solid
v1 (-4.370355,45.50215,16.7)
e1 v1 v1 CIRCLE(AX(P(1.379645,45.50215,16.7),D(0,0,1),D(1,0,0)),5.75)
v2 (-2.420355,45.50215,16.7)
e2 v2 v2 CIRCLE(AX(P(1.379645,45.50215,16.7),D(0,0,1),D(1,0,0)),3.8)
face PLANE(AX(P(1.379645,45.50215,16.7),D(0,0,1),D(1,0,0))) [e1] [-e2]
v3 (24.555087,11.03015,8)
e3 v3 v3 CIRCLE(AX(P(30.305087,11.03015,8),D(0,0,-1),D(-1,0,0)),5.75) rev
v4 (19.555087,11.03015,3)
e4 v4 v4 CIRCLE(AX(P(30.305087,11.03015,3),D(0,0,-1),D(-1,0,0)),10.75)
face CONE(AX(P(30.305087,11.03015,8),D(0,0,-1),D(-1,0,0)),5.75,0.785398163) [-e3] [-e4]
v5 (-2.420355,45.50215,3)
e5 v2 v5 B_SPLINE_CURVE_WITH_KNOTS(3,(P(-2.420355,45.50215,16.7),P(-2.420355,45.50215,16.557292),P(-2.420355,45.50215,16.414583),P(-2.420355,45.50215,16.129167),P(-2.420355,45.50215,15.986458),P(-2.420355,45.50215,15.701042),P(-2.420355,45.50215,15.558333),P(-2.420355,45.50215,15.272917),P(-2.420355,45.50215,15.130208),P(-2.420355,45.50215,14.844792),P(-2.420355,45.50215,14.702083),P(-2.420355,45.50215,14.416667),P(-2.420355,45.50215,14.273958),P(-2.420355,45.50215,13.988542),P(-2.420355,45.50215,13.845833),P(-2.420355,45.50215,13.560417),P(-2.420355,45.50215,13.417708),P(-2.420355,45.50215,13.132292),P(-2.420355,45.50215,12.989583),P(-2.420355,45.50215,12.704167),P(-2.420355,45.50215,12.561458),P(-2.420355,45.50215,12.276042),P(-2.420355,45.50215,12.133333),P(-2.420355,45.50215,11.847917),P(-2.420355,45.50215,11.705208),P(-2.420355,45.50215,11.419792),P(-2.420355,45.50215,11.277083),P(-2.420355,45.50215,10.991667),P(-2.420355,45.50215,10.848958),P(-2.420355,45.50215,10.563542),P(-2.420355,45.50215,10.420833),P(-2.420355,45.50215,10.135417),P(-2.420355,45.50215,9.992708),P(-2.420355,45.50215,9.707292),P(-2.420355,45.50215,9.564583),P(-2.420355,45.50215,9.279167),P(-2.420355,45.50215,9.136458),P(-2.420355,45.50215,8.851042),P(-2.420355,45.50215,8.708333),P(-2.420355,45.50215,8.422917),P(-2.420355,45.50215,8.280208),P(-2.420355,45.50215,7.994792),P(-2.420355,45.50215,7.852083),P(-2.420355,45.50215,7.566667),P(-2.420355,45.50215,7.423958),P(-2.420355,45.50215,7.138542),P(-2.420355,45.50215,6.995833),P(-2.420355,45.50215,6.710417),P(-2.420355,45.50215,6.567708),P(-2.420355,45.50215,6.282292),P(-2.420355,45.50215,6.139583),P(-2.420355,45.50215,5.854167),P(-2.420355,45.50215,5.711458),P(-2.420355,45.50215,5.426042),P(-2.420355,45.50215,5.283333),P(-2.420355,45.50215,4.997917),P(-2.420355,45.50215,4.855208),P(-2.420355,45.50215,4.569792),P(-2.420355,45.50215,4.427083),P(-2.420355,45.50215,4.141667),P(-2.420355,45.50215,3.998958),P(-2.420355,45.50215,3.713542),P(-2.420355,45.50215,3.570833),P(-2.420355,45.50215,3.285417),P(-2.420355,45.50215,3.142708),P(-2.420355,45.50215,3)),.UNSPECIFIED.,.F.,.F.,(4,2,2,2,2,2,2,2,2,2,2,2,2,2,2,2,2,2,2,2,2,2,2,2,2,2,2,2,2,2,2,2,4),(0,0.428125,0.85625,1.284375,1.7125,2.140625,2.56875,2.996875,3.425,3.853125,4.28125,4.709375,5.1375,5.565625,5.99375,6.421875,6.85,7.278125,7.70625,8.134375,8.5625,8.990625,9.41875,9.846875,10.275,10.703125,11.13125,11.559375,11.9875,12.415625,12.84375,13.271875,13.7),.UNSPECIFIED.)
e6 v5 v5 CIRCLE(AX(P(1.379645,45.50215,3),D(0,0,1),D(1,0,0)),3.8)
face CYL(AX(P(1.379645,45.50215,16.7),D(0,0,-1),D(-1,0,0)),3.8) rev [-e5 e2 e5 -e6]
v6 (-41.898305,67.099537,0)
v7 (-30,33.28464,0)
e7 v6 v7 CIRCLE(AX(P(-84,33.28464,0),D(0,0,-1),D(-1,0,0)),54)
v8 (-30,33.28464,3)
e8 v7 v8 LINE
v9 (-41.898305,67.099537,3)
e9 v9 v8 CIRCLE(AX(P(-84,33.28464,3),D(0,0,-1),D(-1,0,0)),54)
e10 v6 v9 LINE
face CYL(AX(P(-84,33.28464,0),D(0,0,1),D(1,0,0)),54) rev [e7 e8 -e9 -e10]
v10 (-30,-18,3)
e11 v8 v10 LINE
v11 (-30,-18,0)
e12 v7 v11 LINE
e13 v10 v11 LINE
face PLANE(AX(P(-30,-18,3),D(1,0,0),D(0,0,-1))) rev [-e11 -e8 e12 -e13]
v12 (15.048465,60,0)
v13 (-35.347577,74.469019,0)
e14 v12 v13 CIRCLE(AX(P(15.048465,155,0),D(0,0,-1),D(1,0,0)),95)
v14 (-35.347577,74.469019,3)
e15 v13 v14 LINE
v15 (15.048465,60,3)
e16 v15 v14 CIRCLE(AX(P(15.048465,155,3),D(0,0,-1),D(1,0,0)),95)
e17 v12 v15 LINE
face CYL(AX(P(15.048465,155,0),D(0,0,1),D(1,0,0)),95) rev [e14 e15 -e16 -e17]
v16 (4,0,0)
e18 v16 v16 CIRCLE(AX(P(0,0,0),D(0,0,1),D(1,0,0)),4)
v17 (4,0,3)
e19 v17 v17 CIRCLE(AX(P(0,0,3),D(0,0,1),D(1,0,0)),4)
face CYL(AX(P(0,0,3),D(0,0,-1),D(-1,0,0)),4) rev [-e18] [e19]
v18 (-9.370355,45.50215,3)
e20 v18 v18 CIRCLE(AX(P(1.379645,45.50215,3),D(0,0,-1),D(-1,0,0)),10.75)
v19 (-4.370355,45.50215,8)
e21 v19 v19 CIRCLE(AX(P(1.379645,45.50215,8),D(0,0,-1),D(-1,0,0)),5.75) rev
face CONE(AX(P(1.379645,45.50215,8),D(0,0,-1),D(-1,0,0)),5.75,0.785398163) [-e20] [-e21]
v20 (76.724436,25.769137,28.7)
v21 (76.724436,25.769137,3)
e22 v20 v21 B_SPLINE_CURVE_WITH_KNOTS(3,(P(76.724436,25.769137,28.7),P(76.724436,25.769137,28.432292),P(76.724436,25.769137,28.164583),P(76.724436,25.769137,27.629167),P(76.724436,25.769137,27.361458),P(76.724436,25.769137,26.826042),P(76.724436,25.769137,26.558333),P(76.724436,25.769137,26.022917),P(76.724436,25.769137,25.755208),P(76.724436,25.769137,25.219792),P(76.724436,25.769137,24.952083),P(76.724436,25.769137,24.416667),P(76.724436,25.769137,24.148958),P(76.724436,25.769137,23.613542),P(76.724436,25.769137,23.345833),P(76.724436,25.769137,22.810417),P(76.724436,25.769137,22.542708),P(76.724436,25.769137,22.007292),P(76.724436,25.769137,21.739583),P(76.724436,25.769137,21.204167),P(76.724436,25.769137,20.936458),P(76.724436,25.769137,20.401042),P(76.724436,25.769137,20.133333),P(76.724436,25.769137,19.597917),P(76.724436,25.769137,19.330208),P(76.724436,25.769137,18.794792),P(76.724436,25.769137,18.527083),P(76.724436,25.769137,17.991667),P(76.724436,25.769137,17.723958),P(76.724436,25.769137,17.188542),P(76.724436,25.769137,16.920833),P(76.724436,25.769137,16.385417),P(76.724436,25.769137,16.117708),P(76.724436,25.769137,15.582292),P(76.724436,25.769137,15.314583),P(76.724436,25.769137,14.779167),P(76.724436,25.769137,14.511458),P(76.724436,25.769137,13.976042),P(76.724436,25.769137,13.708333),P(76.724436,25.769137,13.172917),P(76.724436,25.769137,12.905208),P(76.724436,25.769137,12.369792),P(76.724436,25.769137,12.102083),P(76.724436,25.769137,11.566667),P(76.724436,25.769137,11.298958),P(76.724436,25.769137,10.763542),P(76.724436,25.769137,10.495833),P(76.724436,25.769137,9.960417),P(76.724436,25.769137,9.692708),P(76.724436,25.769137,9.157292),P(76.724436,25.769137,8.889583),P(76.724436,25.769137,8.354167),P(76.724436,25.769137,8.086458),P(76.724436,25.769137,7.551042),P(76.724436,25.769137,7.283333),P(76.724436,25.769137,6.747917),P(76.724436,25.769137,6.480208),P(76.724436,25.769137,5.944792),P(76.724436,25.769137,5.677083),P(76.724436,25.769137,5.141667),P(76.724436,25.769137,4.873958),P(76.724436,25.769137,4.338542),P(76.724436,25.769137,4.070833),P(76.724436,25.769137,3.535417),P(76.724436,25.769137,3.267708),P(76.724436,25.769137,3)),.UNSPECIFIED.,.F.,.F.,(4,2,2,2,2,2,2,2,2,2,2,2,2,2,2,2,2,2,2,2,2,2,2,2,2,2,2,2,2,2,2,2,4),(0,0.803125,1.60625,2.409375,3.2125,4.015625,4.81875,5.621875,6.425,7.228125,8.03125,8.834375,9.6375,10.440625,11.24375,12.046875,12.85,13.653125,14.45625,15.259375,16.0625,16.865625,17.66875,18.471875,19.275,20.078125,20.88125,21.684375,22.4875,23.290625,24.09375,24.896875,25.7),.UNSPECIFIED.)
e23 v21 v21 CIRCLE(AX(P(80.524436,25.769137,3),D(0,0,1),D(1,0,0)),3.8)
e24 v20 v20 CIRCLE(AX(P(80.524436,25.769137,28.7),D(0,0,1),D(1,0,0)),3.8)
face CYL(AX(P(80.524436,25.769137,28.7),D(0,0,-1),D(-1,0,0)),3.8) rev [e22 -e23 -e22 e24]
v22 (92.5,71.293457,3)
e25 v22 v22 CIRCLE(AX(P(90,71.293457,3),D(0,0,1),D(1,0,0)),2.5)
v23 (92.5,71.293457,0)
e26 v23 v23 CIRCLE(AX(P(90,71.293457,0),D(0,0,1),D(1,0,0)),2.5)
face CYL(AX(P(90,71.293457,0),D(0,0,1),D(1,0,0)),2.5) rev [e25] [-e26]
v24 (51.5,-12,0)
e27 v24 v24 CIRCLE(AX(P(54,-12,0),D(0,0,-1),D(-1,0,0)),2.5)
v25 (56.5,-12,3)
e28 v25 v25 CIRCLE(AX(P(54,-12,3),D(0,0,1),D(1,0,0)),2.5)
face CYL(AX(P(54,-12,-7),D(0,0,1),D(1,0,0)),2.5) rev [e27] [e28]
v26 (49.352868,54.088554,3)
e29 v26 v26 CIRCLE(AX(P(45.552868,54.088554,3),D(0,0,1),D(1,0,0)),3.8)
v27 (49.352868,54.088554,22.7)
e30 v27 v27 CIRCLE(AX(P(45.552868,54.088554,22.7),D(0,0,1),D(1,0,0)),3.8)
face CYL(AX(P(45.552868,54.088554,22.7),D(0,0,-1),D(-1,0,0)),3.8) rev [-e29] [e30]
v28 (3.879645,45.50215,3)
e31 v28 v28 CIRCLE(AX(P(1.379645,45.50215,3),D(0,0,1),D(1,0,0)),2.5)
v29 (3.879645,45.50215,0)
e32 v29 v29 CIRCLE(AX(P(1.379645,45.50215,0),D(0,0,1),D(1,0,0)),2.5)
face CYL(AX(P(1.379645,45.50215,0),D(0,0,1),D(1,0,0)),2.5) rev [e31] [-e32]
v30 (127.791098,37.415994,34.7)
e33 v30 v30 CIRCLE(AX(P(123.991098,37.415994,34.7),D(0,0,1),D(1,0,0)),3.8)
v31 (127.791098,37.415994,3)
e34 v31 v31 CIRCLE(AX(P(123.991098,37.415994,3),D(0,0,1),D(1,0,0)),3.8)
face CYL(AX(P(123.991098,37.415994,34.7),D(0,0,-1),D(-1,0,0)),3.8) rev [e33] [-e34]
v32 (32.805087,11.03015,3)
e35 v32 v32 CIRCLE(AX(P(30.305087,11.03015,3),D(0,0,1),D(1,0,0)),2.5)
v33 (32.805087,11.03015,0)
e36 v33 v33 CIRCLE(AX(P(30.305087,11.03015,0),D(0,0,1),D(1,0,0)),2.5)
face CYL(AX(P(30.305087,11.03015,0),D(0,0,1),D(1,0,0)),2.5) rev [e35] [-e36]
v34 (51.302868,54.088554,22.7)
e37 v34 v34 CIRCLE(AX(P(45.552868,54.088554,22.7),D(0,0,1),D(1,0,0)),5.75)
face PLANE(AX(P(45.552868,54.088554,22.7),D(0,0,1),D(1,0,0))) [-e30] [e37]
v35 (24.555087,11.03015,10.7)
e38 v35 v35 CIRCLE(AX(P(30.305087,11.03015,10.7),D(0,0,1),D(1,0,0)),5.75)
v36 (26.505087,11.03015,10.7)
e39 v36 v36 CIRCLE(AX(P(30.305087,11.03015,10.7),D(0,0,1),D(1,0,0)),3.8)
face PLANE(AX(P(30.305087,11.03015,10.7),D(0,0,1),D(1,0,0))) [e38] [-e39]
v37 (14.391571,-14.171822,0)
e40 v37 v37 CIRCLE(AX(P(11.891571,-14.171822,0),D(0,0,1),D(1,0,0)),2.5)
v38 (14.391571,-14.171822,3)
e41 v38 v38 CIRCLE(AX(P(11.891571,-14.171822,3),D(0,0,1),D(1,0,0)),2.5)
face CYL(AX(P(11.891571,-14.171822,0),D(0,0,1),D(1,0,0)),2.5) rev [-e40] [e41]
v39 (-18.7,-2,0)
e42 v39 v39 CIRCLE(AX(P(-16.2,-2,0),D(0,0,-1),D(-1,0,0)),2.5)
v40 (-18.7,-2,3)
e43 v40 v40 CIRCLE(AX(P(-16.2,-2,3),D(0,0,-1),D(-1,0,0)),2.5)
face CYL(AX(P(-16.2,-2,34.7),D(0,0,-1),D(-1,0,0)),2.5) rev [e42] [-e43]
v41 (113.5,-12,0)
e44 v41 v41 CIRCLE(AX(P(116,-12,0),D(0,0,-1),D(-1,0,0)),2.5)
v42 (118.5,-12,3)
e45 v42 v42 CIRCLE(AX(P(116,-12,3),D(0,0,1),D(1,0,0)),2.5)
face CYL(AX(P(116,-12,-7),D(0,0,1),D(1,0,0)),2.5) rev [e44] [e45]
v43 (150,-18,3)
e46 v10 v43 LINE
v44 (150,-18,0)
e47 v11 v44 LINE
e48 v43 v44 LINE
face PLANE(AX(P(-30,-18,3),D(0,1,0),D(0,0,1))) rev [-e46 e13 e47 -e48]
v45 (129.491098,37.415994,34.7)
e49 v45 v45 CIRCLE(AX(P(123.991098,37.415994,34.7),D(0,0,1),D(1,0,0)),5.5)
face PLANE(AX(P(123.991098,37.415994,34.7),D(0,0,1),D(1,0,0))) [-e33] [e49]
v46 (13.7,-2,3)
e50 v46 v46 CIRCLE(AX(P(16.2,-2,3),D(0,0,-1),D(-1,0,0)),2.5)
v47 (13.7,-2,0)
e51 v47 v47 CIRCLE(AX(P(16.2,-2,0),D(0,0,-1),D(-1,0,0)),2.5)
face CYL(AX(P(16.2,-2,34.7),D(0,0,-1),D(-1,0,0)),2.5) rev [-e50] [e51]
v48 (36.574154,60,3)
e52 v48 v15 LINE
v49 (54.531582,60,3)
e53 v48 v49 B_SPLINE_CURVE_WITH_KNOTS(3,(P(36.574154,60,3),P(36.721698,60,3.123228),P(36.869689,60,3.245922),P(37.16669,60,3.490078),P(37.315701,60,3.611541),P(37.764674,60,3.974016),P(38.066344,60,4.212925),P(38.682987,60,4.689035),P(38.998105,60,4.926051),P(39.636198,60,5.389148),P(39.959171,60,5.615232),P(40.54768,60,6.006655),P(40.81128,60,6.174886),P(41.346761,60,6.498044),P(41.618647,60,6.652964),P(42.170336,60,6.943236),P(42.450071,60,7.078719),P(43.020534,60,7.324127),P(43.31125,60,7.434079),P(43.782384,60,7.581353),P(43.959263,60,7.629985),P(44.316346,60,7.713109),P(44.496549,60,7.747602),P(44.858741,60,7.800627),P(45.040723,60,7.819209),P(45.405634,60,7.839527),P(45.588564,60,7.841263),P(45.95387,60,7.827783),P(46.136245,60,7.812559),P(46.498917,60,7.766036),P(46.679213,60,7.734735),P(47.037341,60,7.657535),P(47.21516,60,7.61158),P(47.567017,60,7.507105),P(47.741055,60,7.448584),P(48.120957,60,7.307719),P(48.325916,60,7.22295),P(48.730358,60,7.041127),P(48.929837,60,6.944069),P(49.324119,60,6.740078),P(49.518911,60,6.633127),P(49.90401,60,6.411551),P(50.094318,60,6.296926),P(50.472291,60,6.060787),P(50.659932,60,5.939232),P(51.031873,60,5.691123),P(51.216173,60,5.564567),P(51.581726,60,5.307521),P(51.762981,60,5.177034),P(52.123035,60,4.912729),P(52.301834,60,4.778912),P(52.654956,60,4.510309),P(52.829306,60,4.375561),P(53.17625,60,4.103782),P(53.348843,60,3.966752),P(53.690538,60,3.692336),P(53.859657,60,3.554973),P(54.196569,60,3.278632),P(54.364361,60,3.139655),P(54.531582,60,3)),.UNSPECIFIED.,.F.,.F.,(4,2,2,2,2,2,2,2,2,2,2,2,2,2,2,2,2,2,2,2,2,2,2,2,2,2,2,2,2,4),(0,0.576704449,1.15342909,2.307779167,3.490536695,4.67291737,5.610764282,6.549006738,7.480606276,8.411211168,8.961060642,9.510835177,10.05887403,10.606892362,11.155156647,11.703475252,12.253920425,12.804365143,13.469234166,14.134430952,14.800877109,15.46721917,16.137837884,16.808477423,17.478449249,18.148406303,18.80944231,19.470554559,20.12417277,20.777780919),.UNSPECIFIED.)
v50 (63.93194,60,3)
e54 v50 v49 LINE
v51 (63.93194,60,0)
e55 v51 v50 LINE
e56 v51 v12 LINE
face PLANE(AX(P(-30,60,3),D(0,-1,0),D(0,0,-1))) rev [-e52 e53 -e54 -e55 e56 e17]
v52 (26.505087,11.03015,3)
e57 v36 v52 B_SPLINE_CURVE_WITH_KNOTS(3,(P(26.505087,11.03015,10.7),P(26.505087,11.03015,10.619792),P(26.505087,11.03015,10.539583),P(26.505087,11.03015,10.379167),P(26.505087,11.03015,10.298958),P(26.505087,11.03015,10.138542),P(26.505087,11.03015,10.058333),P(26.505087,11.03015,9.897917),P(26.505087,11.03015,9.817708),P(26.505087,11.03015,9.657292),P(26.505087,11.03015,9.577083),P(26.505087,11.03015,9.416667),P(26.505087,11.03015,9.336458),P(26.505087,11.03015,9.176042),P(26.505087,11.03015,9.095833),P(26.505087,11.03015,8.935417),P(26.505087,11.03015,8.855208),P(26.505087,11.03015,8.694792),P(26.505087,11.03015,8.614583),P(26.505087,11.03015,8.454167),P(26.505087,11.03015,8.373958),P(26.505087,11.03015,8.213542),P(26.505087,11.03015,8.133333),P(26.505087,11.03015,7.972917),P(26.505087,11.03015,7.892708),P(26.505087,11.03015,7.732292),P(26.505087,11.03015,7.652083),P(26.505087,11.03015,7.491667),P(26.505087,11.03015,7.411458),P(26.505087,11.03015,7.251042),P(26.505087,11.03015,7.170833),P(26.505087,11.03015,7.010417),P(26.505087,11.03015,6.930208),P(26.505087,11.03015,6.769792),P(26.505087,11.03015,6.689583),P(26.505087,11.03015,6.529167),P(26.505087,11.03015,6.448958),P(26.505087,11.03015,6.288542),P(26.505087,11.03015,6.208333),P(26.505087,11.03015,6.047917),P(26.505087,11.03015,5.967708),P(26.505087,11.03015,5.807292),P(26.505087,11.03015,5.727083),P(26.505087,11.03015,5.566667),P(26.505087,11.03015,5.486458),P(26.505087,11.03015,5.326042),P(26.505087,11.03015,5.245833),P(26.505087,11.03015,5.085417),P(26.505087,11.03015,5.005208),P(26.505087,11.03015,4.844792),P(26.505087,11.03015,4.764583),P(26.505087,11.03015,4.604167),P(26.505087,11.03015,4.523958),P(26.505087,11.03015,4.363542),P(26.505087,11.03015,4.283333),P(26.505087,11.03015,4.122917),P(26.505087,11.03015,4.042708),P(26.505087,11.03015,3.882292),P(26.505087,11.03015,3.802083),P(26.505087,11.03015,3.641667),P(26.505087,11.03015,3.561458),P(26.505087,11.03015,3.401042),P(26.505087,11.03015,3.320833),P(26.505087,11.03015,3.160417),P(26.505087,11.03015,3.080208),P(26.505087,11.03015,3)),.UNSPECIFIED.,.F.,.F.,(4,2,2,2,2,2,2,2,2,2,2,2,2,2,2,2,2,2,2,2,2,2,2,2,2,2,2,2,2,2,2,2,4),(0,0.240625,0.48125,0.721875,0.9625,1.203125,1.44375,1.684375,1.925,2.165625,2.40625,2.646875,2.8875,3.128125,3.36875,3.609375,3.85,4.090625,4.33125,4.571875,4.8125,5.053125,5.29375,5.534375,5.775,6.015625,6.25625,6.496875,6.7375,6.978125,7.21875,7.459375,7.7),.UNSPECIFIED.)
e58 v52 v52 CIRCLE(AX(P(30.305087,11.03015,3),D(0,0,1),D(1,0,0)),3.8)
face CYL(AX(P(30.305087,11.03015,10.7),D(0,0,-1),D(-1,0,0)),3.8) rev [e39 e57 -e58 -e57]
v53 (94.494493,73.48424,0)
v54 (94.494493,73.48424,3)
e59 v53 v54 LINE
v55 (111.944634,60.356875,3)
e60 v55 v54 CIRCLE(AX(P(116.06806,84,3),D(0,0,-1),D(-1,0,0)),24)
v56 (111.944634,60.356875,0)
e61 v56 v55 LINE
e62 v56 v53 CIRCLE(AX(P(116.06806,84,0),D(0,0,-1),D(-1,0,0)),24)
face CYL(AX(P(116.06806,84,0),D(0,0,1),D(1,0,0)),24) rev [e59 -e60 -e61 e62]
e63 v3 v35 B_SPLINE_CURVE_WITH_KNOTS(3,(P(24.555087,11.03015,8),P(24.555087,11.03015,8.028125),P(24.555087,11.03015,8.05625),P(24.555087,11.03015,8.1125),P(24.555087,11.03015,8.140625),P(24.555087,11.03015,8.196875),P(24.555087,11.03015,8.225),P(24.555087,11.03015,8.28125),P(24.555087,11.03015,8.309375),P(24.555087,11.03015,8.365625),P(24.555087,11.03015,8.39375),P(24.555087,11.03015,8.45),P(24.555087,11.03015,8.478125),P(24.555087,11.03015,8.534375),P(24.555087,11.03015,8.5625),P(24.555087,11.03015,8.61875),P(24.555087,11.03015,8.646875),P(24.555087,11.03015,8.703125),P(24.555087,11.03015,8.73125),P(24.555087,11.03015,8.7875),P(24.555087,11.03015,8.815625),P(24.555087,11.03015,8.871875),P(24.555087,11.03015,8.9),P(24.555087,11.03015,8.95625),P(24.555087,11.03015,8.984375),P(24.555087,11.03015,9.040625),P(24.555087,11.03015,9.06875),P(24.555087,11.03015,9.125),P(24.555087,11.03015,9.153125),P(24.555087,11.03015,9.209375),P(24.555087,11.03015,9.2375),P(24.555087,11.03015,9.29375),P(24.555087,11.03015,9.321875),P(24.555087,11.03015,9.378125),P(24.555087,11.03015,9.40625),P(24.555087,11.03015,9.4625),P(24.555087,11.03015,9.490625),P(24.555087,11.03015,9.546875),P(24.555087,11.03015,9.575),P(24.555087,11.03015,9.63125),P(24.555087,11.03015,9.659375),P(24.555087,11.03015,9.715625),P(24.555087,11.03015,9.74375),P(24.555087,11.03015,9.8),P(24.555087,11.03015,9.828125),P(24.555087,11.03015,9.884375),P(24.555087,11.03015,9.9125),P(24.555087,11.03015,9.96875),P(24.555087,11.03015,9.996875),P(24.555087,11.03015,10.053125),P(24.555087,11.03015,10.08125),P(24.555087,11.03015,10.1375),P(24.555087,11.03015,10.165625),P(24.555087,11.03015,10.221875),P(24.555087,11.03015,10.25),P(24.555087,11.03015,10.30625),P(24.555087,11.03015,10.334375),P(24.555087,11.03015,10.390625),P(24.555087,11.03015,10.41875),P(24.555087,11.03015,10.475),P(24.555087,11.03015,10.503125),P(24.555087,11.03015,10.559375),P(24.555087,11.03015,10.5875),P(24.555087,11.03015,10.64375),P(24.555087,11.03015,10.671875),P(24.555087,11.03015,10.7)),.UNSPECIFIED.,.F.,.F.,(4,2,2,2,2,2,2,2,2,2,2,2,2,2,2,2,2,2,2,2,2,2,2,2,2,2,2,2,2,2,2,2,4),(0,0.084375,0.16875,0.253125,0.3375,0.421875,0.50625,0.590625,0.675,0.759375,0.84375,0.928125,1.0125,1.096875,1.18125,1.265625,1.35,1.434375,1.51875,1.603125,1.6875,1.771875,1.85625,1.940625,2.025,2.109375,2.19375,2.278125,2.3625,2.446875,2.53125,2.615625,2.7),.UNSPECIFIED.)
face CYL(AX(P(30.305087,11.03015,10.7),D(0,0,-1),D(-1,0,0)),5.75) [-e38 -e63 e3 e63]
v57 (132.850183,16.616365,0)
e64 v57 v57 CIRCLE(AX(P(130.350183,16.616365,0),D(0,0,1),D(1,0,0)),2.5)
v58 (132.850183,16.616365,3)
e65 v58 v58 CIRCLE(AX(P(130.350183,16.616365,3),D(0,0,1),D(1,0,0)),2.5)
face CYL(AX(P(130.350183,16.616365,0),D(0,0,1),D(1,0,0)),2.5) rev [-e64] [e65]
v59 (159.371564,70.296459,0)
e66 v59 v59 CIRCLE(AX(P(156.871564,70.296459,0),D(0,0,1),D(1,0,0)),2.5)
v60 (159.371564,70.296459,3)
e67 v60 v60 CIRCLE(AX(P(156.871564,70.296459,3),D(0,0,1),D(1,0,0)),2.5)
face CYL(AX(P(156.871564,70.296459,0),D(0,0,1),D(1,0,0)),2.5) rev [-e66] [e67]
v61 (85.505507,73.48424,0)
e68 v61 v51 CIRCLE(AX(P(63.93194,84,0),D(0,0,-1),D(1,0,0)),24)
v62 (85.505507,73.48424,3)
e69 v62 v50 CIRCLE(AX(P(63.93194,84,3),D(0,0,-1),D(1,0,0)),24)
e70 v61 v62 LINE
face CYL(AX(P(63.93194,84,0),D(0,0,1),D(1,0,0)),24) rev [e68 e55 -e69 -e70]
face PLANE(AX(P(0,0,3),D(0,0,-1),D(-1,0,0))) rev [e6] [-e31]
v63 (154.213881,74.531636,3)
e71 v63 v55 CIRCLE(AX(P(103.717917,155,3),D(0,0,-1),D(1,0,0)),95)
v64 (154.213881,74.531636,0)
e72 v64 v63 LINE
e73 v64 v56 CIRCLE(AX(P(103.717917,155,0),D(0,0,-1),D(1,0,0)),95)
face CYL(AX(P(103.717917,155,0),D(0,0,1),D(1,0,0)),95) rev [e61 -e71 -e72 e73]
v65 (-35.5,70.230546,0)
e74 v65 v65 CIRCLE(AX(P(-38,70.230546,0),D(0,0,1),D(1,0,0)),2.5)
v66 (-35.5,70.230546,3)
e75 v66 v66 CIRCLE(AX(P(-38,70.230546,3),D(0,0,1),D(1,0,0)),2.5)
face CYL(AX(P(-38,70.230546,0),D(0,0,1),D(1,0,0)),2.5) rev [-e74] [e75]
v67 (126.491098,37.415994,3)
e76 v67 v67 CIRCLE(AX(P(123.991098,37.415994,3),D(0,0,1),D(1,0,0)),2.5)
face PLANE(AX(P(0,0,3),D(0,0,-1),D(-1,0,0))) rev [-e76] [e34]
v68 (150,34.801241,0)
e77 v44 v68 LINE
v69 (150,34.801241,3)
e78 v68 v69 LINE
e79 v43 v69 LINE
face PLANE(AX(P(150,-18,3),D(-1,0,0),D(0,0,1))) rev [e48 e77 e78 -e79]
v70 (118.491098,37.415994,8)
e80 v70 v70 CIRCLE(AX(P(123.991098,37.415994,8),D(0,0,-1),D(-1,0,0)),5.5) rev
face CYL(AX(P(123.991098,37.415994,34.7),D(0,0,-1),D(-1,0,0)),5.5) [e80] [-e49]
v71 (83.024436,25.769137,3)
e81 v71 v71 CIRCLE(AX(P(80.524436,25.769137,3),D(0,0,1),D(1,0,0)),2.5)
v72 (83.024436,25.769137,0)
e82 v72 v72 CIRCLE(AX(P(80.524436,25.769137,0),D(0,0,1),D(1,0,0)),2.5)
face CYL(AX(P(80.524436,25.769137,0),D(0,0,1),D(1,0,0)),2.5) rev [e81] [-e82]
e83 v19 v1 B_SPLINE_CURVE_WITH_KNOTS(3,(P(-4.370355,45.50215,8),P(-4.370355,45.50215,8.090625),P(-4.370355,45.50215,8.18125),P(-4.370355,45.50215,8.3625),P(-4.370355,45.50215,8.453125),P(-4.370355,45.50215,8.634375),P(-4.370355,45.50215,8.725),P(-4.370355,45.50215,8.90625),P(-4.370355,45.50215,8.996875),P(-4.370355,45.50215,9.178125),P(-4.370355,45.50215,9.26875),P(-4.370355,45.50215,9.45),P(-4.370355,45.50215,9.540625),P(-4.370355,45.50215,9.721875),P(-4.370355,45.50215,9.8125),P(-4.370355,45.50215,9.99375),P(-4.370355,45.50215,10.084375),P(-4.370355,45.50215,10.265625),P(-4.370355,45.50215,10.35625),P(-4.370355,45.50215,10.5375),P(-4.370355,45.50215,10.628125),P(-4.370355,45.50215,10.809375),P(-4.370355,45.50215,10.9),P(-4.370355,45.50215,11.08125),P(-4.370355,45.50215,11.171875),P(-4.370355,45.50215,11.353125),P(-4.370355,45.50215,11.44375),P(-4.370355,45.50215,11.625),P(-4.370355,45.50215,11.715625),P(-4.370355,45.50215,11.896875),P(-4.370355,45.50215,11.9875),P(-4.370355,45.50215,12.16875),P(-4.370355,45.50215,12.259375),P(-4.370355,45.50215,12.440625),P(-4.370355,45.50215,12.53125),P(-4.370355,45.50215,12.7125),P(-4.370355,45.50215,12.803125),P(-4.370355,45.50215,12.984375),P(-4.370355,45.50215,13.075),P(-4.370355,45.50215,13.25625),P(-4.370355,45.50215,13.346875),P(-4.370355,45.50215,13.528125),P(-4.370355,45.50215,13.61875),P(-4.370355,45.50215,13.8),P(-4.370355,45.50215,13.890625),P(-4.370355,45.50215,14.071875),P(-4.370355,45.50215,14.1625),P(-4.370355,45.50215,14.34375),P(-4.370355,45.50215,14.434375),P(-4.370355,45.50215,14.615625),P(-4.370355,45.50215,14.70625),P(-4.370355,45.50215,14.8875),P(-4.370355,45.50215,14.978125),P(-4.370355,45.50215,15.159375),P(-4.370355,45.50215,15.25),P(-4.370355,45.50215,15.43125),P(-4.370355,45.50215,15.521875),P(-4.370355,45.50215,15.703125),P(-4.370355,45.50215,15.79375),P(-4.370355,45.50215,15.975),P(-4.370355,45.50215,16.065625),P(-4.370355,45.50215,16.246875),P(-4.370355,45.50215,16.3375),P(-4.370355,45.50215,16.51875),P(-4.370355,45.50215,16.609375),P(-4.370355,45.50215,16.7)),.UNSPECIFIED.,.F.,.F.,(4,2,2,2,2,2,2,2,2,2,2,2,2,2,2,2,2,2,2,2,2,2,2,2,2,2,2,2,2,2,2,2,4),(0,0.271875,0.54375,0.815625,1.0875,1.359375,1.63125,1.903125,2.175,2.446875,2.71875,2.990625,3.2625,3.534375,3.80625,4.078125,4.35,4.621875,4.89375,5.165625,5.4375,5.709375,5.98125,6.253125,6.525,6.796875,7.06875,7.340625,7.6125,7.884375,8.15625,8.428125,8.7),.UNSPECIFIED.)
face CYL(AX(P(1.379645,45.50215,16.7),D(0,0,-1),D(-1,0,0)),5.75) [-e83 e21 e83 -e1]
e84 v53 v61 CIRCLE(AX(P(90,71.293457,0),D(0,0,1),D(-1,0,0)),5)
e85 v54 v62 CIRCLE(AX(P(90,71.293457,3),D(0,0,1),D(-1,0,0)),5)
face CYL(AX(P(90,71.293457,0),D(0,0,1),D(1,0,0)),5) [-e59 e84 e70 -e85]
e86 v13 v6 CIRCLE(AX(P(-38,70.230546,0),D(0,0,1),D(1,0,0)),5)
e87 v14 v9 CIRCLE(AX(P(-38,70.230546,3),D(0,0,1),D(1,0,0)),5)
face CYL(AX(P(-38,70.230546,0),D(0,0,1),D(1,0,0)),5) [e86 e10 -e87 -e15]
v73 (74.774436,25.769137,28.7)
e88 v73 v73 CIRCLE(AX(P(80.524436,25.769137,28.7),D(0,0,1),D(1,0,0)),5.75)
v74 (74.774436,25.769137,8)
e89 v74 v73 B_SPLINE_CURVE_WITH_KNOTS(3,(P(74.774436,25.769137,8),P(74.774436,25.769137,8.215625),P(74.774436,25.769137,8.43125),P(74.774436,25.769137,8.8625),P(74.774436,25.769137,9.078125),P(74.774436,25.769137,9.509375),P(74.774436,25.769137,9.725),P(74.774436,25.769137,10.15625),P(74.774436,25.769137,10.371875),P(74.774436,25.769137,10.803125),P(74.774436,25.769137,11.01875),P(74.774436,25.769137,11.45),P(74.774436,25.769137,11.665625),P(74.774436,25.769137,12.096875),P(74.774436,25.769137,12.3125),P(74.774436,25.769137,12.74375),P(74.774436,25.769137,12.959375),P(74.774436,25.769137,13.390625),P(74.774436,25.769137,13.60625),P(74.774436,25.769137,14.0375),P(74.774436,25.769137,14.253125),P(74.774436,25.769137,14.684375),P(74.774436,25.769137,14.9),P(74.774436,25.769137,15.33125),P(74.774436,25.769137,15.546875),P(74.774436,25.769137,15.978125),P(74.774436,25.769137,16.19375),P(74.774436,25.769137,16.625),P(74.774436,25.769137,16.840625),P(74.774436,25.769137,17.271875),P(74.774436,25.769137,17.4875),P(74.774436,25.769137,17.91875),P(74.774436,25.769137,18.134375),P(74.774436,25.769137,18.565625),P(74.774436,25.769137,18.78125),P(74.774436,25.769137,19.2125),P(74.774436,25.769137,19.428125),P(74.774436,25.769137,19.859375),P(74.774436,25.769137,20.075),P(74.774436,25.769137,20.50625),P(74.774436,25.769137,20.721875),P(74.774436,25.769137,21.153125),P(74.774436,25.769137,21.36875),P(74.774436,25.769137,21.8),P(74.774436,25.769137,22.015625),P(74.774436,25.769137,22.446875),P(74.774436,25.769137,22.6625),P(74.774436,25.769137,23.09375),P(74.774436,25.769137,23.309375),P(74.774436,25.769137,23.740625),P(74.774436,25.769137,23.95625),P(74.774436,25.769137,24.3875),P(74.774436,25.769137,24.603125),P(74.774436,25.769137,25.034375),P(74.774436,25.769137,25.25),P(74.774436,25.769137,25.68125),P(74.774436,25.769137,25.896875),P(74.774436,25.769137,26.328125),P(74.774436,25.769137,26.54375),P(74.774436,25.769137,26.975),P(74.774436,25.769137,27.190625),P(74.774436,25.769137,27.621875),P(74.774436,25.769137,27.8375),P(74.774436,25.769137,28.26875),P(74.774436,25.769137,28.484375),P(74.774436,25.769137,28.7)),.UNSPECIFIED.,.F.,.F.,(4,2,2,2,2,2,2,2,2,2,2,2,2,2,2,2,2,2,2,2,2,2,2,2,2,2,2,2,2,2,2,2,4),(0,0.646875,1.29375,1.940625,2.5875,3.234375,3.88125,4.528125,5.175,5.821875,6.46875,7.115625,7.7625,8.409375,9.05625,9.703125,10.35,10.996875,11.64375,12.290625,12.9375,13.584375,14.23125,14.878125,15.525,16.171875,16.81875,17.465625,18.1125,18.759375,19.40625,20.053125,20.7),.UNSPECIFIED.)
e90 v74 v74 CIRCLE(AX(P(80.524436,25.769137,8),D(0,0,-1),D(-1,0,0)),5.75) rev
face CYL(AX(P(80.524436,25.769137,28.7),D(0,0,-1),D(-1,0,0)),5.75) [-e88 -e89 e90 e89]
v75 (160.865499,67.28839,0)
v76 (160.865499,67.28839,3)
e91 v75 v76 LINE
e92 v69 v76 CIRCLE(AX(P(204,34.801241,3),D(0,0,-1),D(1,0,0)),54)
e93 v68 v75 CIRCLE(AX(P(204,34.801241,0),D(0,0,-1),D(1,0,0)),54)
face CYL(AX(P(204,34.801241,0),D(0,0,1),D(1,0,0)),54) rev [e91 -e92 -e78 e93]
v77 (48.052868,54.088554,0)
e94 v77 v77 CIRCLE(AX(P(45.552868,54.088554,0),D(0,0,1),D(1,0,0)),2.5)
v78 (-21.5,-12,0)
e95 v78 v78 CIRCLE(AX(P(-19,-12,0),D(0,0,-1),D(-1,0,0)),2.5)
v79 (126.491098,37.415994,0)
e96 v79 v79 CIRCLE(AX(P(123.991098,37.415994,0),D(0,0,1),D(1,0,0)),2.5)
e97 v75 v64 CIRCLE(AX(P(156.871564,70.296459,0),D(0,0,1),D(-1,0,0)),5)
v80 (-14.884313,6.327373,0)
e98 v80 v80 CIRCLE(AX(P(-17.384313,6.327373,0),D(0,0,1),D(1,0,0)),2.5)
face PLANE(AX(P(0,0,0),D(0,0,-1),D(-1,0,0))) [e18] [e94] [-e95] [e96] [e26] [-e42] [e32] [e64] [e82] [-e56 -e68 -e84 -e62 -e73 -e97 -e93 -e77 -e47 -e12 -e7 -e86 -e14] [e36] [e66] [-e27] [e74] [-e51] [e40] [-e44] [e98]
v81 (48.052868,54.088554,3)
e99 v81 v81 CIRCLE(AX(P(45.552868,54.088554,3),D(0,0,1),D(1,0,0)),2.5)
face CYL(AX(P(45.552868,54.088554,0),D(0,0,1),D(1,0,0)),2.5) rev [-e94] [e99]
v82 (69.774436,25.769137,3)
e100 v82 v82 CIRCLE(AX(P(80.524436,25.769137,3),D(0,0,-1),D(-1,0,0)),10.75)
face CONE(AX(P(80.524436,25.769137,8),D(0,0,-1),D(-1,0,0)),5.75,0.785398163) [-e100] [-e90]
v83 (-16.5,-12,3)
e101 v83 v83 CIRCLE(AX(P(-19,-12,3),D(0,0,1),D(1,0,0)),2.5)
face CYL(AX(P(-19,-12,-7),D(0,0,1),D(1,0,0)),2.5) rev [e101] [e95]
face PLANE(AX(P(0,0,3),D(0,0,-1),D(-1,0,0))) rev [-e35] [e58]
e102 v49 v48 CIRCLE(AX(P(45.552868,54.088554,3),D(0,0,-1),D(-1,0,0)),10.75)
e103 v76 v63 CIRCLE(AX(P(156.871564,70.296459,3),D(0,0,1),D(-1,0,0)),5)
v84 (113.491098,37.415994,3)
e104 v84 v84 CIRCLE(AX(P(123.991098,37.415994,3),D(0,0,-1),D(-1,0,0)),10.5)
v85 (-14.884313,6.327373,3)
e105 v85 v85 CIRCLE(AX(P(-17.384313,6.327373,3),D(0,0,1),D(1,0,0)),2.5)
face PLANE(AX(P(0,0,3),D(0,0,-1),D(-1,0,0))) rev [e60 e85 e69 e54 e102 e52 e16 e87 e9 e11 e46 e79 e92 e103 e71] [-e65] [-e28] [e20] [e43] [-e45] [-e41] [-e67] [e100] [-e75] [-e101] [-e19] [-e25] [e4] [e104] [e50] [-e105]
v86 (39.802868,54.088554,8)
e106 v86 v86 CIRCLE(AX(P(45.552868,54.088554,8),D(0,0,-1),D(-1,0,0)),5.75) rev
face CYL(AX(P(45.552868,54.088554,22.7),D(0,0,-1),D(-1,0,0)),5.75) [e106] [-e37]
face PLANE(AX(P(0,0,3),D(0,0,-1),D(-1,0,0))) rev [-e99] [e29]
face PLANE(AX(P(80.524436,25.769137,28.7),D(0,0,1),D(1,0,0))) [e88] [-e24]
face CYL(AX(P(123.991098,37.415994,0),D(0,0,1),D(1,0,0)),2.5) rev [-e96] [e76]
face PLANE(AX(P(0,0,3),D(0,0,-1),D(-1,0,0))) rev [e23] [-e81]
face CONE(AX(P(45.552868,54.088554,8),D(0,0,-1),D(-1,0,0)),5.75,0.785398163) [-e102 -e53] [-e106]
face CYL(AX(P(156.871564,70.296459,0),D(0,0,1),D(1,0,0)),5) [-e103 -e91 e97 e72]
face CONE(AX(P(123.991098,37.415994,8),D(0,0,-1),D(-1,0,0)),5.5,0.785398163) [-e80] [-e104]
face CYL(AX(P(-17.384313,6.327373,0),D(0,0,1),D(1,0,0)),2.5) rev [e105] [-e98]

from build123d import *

# Parameters (mm, degrees)
SKETCH1_W           = 180
SKETCH1_H           = 78
SKETCH1_R           = 4
BOSS_EXTRUDE1_DEPTH = 3
SKETCH2_R           = 2.5
CUT_EXTRUDE1_DEPTH  = 3
SKETCH4_R           = 2.5
CUT_EXTRUDE3_DEPTH  = 10
SKETCH5_R           = 2.5
BOSS_EXTRUDE2_DEPTH = 3
SKETCH6_R           = 2.5
BOSS_EXTRUDE3_DEPTH = 3
SKETCH7_R           = 2.5
CUT_EXTRUDE4_DEPTH  = 179.975122888
SKETCH8_R           = 5.75
SKETCH8_R_2         = 3.8
BOSS_EXTRUDE4_DEPTH = 13.7
SKETCH9_R           = 5.75
SKETCH9_R_2         = 3.8
BOSS_EXTRUDE5_DEPTH = 7.7
SKETCH10_R          = 5.75
SKETCH10_R_2        = 3.8
BOSS_EXTRUDE6_DEPTH = 19.7
SKETCH11_R          = 5.75
SKETCH11_R_2        = 3.8
BOSS_EXTRUDE7_DEPTH = 25.7
CHAMFER1_SIZE       = 5
SKETCH12_R          = 5.5
SKETCH12_R_2        = 3.8
BOSS_EXTRUDE8_DEPTH = 31.7
CHAMFER2_SIZE       = 5
SKETCH13_R          = 2.5
CUT_EXTRUDE5_DEPTH  = 183.283253791


with BuildPart() as part:
    # Sketch1 → Boss-Extrude1 (new body)
    with BuildSketch(Plane.XY):
        with Locations((60, 21)):
            Rectangle(SKETCH1_W, SKETCH1_H)
        Circle(SKETCH1_R, mode=Mode.SUBTRACT)
    extrude(amount=BOSS_EXTRUDE1_DEPTH)

    # Sketch2 → Cut-Extrude1 (cut)
    with BuildSketch(Plane.XY.offset(3)):
        with Locations((1.379644584, 45.502149563)):
            Circle(SKETCH2_R)
        with Locations((30.30508702, 11.030149622)):
            Circle(SKETCH2_R)
        with Locations((45.55286784, 54.088554355)):
            Circle(SKETCH2_R)
        with Locations((80.524436105, 25.769136757)):
            Circle(SKETCH2_R)
        with Locations((123.991098288, 37.415993787)):
            Circle(SKETCH2_R)
        with Locations((130.350182866, 16.616365345)):
            Circle(SKETCH2_R)
    extrude(amount=-CUT_EXTRUDE1_DEPTH, mode=Mode.SUBTRACT)

    # Sketch4 → Cut-Extrude3 (cut)
    with BuildSketch(Plane.XY.offset(3)):
        with Locations((54, -12)):
            Circle(SKETCH4_R)
        with Locations((-19, -12)):
            Circle(SKETCH4_R)
        with Locations((116, -12)):
            Circle(SKETCH4_R)
    extrude(amount=-CUT_EXTRUDE3_DEPTH, mode=Mode.SUBTRACT)

    # Sketch5 → Boss-Extrude2 (add)
    # profile 1 of 2: a face of its own
    with BuildSketch(Plane.XY.offset(3)):
        with BuildLine():
            Line((116.068060007, 60), (116.068060007, 53.293456509))
            Line((116.068060007, 53.293456509), (63.931939993, 53.293456509))
            Line((63.931939993, 53.293456509), (63.931939993, 60))
            ThreePointArc((63.931939993, 60), (76.652430488, 63.648363172), (85.505506895, 73.48423987))
            ThreePointArc((85.505506895, 73.48423987), (90, 76.293456509), (94.494493105, 73.48423987))
            ThreePointArc((94.494493105, 73.48423987), (103.347569512, 63.648363172), (116.068060007, 60))
        make_face()
        with Locations((90, 71.293456509)):
            Circle(SKETCH5_R, mode=Mode.SUBTRACT)
    # profile 2 of 2: a face of its own
    with BuildSketch(Plane.XY.offset(3)):
        with BuildLine():
            Line((15.048465346, 60), (-9.629718418, 52.415464707))
            Line((-9.629718418, 52.415464707), (-30, 33.284639637))
            ThreePointArc((-30, 33.284639637), (-33.061352956, 51.208206171), (-41.898305085, 67.099537024))
            ThreePointArc((-41.898305085, 67.099537024), (-41.737026969, 73.552387313), (-35.347576733, 74.469018739))
            ThreePointArc((-35.347576733, 74.469018739), (-11.167529583, 63.688874665), (15.048465346, 60))
        make_face()
        with Locations((-38, 70.230546041)):
            Circle(SKETCH5_R, mode=Mode.SUBTRACT)
    extrude(amount=-BOSS_EXTRUDE2_DEPTH)

    # Sketch6 → Boss-Extrude3 (add)
    with BuildSketch(Plane.XY.offset(3)):
        with BuildLine():
            Line((103.71791688, 60), (150, 34.801241353))
            ThreePointArc((150, 34.801241353), (152.78836529, 51.929243873), (160.8654989, 67.28838981))
            ThreePointArc((160.8654989, 67.28838981), (160.554300014, 73.67838942), (154.213881277, 74.531636156))
            ThreePointArc((154.213881277, 74.531636156), (129.990577907, 63.705162892), (103.71791688, 60))
        make_face()
        with Locations((156.871563613, 70.296459112)):
            Circle(SKETCH6_R, mode=Mode.SUBTRACT)
    extrude(amount=-BOSS_EXTRUDE3_DEPTH)

    # Sketch7 → Cut-Extrude4 (cut, through all)
    with BuildSketch(Plane.XY.offset(3)):
        with Locations((11.891570779, -14.171822198)):
            Circle(SKETCH7_R)
        with Locations((-17.384313485, 6.327372652)):
            Circle(SKETCH7_R)
    extrude(amount=-CUT_EXTRUDE4_DEPTH, mode=Mode.SUBTRACT)

    # Sketch8 → Boss-Extrude4 (add)
    with BuildSketch(Plane.XY.offset(3)):
        with Locations(Location((1.379644584, 45.502149563, 0), (0, 0, 180))):
            Circle(SKETCH8_R)
        with Locations(Location((1.379644584, 45.502149563, 0), (0, 0, 180))):
            Circle(SKETCH8_R_2, mode=Mode.SUBTRACT)
    extrude(amount=BOSS_EXTRUDE4_DEPTH)

    # Sketch9 → Boss-Extrude5 (add)
    with BuildSketch(Plane.XY.offset(3)):
        with Locations(Location((30.30508702, 11.030149622, 0), (0, 0, 180))):
            Circle(SKETCH9_R)
        with Locations(Location((30.30508702, 11.030149622, 0), (0, 0, 180))):
            Circle(SKETCH9_R_2, mode=Mode.SUBTRACT)
    extrude(amount=BOSS_EXTRUDE5_DEPTH)

    # Sketch10 → Boss-Extrude6 (add)
    with BuildSketch(Plane.XY.offset(3)):
        with Locations(Location((45.55286784, 54.088554355, 0), (0, 0, 180))):
            Circle(SKETCH10_R)
        with Locations((45.55286784, 54.088554355)):
            Circle(SKETCH10_R_2, mode=Mode.SUBTRACT)
    extrude(amount=BOSS_EXTRUDE6_DEPTH)

    # Sketch11 → Boss-Extrude7 (add)
    with BuildSketch(Plane.XY.offset(3)):
        with Locations(Location((80.524436105, 25.769136757, 0), (0, 0, 180))):
            Circle(SKETCH11_R)
        with Locations(Location((80.524436105, 25.769136757, 0), (0, 0, 180))):
            Circle(SKETCH11_R_2, mode=Mode.SUBTRACT)
    extrude(amount=BOSS_EXTRUDE7_DEPTH)

    # Chamfer1
    # the kernel refuses this chamfer: 5 mm, written as the material it adds along each edge
    with BuildSketch(Plane(origin=(1.379644584, 45.502149563, 3), x_dir=(-1, 0, 0), z_dir=(0, 1, 0))) as chamfer1_piece_1:
        Polygon((5.75 + CHAMFER1_SIZE, 0), (5.75, CHAMFER1_SIZE), (5.75, 0), align=None)
    revolve(axis=Axis((1.379644584, 45.502149563, 3), (0, 0, 1)))
    with BuildSketch(Plane(origin=(30.30508702, 11.030149622, 3), x_dir=(-1, 0, 0), z_dir=(0, 1, 0))) as chamfer1_piece_2:
        Polygon((5.75 + CHAMFER1_SIZE, 0), (5.75, CHAMFER1_SIZE), (5.75, 0), align=None)
    revolve(axis=Axis((30.30508702, 11.030149622, 3), (0, 0, 1)))
    with BuildSketch(Plane(origin=(45.55286784, 54.088554355, 3), x_dir=(-1, 0, 0), z_dir=(0, 1, 0))) as chamfer1_piece_3_section:
        Polygon((5.75 + CHAMFER1_SIZE, 0), (5.75, CHAMFER1_SIZE), (5.75, 0), align=None)
    chamfer1_piece_3 = revolve(axis=Axis((45.55286784, 54.088554355, 3), (0, 0, 1)), mode=Mode.PRIVATE)
    chamfer1_piece_3 = split(chamfer1_piece_3, bisect_by=Plane(origin=(53.746055157, 60, 5.443187317), z_dir=(0, -1, 0)), keep=Keep.TOP, mode=Mode.PRIVATE)
    add(chamfer1_piece_3)
    with BuildSketch(Plane(origin=(80.524436105, 25.769136757, 3), x_dir=(-1, 0, 0), z_dir=(0, 1, 0))) as chamfer1_piece_4:
        Polygon((5.75 + CHAMFER1_SIZE, 0), (5.75, CHAMFER1_SIZE), (5.75, 0), align=None)
    revolve(axis=Axis((80.524436105, 25.769136757, 3), (0, 0, 1)))

    # Sketch12 → Boss-Extrude8 (add)
    with BuildSketch(Plane.XY.offset(3)):
        with Locations(Location((123.991098288, 37.415993787, 0), (0, 0, 180))):
            Circle(SKETCH12_R)
        with Locations((123.991098288, 37.415993787)):
            Circle(SKETCH12_R_2, mode=Mode.SUBTRACT)
    extrude(amount=BOSS_EXTRUDE8_DEPTH)

    # Chamfer2
    chamfer2_edges = [part.edges().sort_by_distance(p)[0] for p in [
        (129.491098288, 37.415993787, 3),
    ]]
    chamfer(chamfer2_edges, length=CHAMFER2_SIZE)

    # Sketch13 → Cut-Extrude5 (cut, through all)
    with BuildSketch(Plane(origin=(0, 0, 0), x_dir=(-1, 0, 0), z_dir=(0, 0, -1))):
        with Locations((-16.2, -2)):
            Circle(SKETCH13_R)
        with Locations((16.2, -2)):
            Circle(SKETCH13_R)
    extrude(amount=-CUT_EXTRUDE5_DEPTH, mode=Mode.SUBTRACT)


solid = part.part
